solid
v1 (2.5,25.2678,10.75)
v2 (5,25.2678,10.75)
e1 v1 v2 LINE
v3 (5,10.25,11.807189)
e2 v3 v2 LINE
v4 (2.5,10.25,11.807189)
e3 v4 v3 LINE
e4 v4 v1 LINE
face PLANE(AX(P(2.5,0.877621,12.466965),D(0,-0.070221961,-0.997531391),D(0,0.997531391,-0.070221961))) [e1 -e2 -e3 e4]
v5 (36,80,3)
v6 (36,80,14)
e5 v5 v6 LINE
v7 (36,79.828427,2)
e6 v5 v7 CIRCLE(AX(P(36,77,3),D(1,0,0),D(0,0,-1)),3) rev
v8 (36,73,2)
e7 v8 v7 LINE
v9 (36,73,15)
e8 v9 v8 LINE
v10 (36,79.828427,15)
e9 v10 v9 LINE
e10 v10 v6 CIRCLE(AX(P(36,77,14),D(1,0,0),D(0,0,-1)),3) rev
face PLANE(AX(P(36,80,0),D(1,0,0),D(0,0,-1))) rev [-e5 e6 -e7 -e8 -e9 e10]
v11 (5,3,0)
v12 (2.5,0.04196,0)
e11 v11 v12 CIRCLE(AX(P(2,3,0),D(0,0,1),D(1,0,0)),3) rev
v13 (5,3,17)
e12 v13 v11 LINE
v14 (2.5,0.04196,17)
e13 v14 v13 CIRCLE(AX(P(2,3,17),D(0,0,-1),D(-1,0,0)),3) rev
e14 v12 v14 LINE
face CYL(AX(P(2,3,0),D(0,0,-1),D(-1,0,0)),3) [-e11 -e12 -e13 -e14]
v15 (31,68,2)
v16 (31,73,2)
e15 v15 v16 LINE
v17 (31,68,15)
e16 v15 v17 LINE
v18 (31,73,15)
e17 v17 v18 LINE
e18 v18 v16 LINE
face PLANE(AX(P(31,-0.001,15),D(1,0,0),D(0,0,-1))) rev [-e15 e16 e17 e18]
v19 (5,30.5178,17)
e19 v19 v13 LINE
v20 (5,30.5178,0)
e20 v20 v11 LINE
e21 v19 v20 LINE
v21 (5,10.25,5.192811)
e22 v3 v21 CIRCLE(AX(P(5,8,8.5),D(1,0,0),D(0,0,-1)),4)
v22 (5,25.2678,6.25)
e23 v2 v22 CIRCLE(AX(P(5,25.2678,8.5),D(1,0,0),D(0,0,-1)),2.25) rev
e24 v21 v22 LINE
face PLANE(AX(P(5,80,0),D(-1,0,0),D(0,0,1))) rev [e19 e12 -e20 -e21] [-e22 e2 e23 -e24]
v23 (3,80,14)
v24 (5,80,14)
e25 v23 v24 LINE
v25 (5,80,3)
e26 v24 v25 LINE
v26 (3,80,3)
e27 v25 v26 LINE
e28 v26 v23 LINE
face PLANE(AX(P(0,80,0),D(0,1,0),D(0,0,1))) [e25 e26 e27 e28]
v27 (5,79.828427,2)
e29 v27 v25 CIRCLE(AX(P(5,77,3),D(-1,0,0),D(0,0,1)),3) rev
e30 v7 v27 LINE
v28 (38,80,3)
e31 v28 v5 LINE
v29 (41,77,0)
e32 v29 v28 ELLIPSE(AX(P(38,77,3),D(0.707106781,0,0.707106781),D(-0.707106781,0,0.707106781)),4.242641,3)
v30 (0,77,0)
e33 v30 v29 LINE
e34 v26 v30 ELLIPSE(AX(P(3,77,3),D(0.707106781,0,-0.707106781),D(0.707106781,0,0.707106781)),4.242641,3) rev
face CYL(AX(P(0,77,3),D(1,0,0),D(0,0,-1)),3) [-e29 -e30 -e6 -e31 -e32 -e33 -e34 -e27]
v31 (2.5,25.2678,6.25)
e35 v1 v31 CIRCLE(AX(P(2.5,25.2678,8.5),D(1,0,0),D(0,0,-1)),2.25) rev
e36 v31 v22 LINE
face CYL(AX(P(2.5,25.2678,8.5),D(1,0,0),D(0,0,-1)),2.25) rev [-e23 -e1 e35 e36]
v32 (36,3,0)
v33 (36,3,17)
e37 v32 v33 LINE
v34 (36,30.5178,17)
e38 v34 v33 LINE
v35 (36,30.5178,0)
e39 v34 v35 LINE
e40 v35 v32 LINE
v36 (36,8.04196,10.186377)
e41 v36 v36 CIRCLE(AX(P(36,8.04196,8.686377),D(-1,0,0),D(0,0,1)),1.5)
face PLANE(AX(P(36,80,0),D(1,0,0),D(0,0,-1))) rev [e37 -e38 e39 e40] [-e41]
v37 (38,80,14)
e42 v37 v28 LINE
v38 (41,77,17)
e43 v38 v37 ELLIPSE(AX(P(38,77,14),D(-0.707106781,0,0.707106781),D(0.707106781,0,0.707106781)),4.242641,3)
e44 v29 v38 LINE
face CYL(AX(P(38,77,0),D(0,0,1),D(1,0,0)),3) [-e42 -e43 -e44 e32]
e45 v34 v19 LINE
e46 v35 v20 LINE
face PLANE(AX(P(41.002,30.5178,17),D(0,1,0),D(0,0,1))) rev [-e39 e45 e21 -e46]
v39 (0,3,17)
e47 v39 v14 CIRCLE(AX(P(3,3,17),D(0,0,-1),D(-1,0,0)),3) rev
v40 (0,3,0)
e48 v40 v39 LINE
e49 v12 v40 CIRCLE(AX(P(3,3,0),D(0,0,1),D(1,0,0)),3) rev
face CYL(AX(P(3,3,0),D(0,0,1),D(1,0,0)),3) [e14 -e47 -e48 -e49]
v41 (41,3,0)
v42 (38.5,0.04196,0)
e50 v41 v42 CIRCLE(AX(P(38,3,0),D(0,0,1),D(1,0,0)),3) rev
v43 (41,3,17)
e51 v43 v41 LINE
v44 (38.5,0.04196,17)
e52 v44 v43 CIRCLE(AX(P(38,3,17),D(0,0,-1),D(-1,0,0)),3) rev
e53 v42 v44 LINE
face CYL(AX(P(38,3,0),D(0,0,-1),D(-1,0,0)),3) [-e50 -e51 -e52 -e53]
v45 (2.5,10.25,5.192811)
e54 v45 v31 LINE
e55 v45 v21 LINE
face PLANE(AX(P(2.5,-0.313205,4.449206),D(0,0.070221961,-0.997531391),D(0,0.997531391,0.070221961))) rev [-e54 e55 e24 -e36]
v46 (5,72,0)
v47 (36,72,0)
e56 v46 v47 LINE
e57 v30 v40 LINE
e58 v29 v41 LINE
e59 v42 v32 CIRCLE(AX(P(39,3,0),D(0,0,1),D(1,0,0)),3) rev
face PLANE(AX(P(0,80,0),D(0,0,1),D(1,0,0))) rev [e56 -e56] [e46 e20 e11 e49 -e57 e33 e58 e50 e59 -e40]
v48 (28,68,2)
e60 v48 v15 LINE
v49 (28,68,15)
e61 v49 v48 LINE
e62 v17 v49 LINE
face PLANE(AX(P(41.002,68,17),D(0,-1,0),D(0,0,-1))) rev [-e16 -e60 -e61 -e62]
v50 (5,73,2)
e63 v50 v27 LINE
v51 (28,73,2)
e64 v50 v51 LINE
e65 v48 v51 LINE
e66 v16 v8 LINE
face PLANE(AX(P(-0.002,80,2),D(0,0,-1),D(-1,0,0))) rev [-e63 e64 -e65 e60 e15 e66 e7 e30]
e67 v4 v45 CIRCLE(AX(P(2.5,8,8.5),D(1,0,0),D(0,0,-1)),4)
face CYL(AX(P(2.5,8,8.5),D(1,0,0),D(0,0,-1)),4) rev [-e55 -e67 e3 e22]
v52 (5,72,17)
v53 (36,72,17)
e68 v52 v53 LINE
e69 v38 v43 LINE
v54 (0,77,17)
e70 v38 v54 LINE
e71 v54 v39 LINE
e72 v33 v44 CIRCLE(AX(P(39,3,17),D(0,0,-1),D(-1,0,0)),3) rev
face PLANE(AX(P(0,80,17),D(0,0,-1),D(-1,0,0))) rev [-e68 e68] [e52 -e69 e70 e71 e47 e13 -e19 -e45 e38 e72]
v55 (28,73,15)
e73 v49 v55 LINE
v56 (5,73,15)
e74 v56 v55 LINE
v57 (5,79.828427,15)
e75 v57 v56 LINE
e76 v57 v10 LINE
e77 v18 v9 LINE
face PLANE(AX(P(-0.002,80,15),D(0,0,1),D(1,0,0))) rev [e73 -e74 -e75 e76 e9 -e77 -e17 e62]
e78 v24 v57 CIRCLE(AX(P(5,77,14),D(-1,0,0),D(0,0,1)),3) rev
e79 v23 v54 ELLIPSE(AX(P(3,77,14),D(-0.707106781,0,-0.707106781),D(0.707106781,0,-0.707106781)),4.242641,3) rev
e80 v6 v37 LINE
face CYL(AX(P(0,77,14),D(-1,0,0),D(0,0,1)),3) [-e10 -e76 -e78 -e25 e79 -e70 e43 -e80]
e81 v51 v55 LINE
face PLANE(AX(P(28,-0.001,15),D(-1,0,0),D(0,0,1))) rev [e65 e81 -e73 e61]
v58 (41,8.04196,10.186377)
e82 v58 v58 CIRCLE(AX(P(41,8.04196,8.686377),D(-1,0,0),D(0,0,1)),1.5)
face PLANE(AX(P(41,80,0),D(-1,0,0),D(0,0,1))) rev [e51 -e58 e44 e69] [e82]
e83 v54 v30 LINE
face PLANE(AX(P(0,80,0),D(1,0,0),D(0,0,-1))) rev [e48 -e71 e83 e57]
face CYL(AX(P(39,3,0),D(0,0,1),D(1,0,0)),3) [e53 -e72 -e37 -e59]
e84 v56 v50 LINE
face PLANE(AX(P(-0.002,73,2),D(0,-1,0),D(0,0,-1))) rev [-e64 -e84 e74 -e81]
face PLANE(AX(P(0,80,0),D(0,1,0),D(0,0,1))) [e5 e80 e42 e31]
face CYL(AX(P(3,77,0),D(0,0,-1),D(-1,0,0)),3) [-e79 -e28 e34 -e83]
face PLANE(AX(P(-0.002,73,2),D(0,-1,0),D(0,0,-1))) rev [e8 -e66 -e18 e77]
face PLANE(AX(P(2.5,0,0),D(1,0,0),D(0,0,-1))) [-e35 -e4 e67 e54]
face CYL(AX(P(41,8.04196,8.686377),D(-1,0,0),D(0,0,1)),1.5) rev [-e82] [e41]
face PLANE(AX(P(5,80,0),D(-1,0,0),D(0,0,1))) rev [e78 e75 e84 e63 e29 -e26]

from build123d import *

# Parameters (mm, degrees)
SKETCH1_W             = 5
SKETCH1_H             = 17
BOSS_EXTRUDE1_DEPTH   = 80
BOSS_EXTRUDE1_2_DEPTH = 80
CUT_EXTRUDE1_DEPTH    = 2.5
BOSS_EXTRUDE2_REACH   = 91.359
SKETCH5_W             = 3
SKETCH5_H             = 13
CUT_EXTRUDE2_DEPTH    = 5
FILLET1_R             = 3
FILLET2_R             = 3
SKETCH6_R             = 1.5
CUT_EXTRUDE3_DEPTH    = 90.358827208
BOSS_EXTRUDE3_REACH   = 91.359
SKETCH7_W             = 17
SKETCH7_H             = 37.482200285


with BuildPart() as part:
    # Sketch1 → Boss-Extrude1 (new body)
    with BuildSketch(Plane(origin=(0, 0, 0), x_dir=(1, 0, 0), z_dir=(0, 1, 0))):
        with Locations((2.5, -8.5)):
            Rectangle(SKETCH1_W, SKETCH1_H)
    extrude(amount=BOSS_EXTRUDE1_DEPTH)

    # Sketch2 → Cut-Extrude1 (cut)
    with BuildSketch(Plane(origin=(5, 0, 0), x_dir=(0, 0, -1), z_dir=(1, 0, 0))):
        with BuildLine():
            Line((-10.75, 25.267799715), (-11.807189139, 10.25))
            ThreePointArc((-11.807189139, 10.25), (-8.5, 12), (-5.192810861, 10.25))
            Line((-5.192810861, 10.25), (-6.25, 25.267799715))
            ThreePointArc((-6.25, 25.267799715), (-8.5, 27.517799715), (-10.75, 25.267799715))
        make_face()
        with BuildLine():
            ThreePointArc((-5.192810861, 10.25), (-8.5, 12), (-11.807189139, 10.25))
            Line((-11.807189139, 10.25), (-11.807189139, 5.75))
            ThreePointArc((-11.807189139, 5.75), (-8.5, 4), (-5.192810861, 5.75))
            Line((-5.192810861, 5.75), (-5.192810861, 10.25))
        make_face()
        with BuildLine():
            Line((-11.807189139, 5.75), (-11.807189139, 10.25))
            ThreePointArc((-11.807189139, 10.25), (-12.5, 8), (-11.807189139, 5.75))
        make_face()
        with BuildLine():
            ThreePointArc((-4.5, 8), (-4.677124344, 9.177124344), (-5.192810861, 10.25))
            Line((-5.192810861, 10.25), (-5.192810861, 5.75))
            ThreePointArc((-5.192810861, 5.75), (-4.677124344, 6.822875656), (-4.5, 8))
        make_face()
    extrude(amount=-CUT_EXTRUDE1_DEPTH, mode=Mode.SUBTRACT)


with BuildPart() as body_2:
    # Sketch1 → Boss-Extrude1 2 (new body)
    with BuildSketch(Plane(origin=(0, 0, 0), x_dir=(1, 0, 0), z_dir=(0, 1, 0))):
        with Locations((38.5, -8.5)):
            Rectangle(SKETCH1_W, SKETCH1_H)
    extrude(amount=BOSS_EXTRUDE1_2_DEPTH)


    # Sketch4 → Boss-Extrude2 (add, up to next)
    with BuildSketch(Plane.ZY.offset(-36), mode=Mode.PRIVATE) as boss_extrude2_sk1:
        Polygon((2, 73), (15, 73), (15, 80), (17, 80), (17, 72), (17, 68), (0, 68), (0, 72), (0, 80), (2, 80), align=None)
    boss_extrude2_tool1 = extrude(boss_extrude2_sk1.sketch, amount=BOSS_EXTRUDE2_REACH, mode=Mode.PRIVATE) - part.part
    add(boss_extrude2_tool1.solids().sort_by_distance((36, 71.986726, 8.5))[0])

    # Sketch5 → Cut-Extrude2 (cut)
    with BuildSketch(Plane(origin=(0, 73, 0), x_dir=(1, 0, 0), z_dir=(0, 1, 0))):
        with Locations((29.5, -8.5)):
            Rectangle(SKETCH5_W, SKETCH5_H)
    extrude(amount=-CUT_EXTRUDE2_DEPTH, mode=Mode.SUBTRACT)

    # Fillet1
    # the kernel refuses this fillet: 3 mm, written as the material it takes off along each edge
    with BuildSketch(Plane(origin=(36, 0, 24.5), x_dir=(0, 1, 0), z_dir=(0, 0, -1)), Plane(origin=(41, 0, -7.5), x_dir=(0, 1, 0), z_dir=(0, 0, 1)), Plane(origin=(41, 80, -7.5), x_dir=(-1, 0, 0), z_dir=(0, 0, 1))) as fillet1_piece_1:
        with BuildLine():
            CenterArc((FILLET1_R, FILLET1_R), FILLET1_R, 180, 90)
            Line((0, FILLET1_R), (0, 0))
            Line((0, 0), (FILLET1_R, 0))
        make_face()
    extrude(amount=32, mode=Mode.SUBTRACT)
    with BuildSketch(Plane(origin=(-2.5, 80, 17), x_dir=(0, 0, -1), z_dir=(1, 0, 0)), Plane(origin=(48.5, 80, 0), x_dir=(0, 0, 1), z_dir=(-1, 0, 0))) as fillet1_piece_2:
        with BuildLine():
            CenterArc((FILLET1_R, -FILLET1_R), FILLET1_R, 90, 90)
            Line((0, -FILLET1_R), (0, 0))
            Line((0, 0), (FILLET1_R, 0))
        make_face()
    extrude(amount=51, mode=Mode.SUBTRACT)

    # Sketch6 → Cut-Extrude3 (cut, through all)
    with BuildSketch(Plane.ZY.offset(-36)):
        with Locations((8.686376561, 8.041960108)):
            Circle(SKETCH6_R)
    extrude(amount=-CUT_EXTRUDE3_DEPTH, mode=Mode.SUBTRACT)

    # Sketch7 → Boss-Extrude3 (add, up to next)
    with BuildSketch(Plane(origin=(5, 0, 0), x_dir=(0, 0, -1), z_dir=(1, 0, 0)), mode=Mode.PRIVATE) as boss_extrude3_sk1:
        with Locations((-8.5, 49.258899857)):
            Rectangle(SKETCH7_W, SKETCH7_H)
    boss_extrude3_tool1 = extrude(boss_extrude3_sk1.sketch, amount=BOSS_EXTRUDE3_REACH, mode=Mode.PRIVATE) - body_2.part


with BuildPart() as part_1:
    add(part.part)

    # Fillet2
    # the kernel refuses this fillet: 3 mm, written as the material it takes off along each edge
    with BuildSketch(Plane(origin=(0, 0, 24.5), x_dir=(0, 1, 0), z_dir=(0, 0, -1)), Plane(origin=(5, 0, -7.5), x_dir=(0, 1, 0), z_dir=(0, 0, 1))) as fillet2_piece_1:
        with BuildLine():
            CenterArc((FILLET2_R, FILLET2_R), FILLET2_R, 180, 90)
            Line((0, FILLET2_R), (0, 0))
            Line((0, 0), (FILLET2_R, 0))
        make_face()
    extrude(amount=32, mode=Mode.SUBTRACT)
    with BuildSketch(Plane(origin=(12.5, 80, 17), x_dir=(0, 0, -1), z_dir=(-1, 0, 0))) as fillet2_piece_2:
        with BuildLine():
            CenterArc((FILLET2_R, FILLET2_R), FILLET2_R, 180, 90)
            Line((0, FILLET2_R), (0, 0))
            Line((0, 0), (FILLET2_R, 0))
        make_face()
    extrude(amount=20, mode=Mode.SUBTRACT)
    with BuildSketch(Plane(origin=(0, 80, 24.5), x_dir=(0, -1, 0), z_dir=(0, 0, -1))) as fillet2_piece_3:
        with BuildLine():
            CenterArc((FILLET2_R, -FILLET2_R), FILLET2_R, 90, 90)
            Line((0, -FILLET2_R), (0, 0))
            Line((0, 0), (FILLET2_R, 0))
        make_face()
    extrude(amount=32, mode=Mode.SUBTRACT)
    with BuildSketch(Plane(origin=(-7.5, 80, 0), x_dir=(0, -1, 0), z_dir=(1, 0, 0))) as fillet2_piece_4:
        with BuildLine():
            CenterArc((FILLET2_R, -FILLET2_R), FILLET2_R, 90, 90)
            Line((0, -FILLET2_R), (0, 0))
            Line((0, 0), (FILLET2_R, 0))
        make_face()
    extrude(amount=20, mode=Mode.SUBTRACT)


with BuildPart() as body_2_1:
    add(body_2.part)

    add(part_1.part)  # Boss-Extrude3 merges part
    add(boss_extrude3_tool1.solids().sort_by_distance((5, 49.2589, 8.5))[0])


solid = body_2_1.part
